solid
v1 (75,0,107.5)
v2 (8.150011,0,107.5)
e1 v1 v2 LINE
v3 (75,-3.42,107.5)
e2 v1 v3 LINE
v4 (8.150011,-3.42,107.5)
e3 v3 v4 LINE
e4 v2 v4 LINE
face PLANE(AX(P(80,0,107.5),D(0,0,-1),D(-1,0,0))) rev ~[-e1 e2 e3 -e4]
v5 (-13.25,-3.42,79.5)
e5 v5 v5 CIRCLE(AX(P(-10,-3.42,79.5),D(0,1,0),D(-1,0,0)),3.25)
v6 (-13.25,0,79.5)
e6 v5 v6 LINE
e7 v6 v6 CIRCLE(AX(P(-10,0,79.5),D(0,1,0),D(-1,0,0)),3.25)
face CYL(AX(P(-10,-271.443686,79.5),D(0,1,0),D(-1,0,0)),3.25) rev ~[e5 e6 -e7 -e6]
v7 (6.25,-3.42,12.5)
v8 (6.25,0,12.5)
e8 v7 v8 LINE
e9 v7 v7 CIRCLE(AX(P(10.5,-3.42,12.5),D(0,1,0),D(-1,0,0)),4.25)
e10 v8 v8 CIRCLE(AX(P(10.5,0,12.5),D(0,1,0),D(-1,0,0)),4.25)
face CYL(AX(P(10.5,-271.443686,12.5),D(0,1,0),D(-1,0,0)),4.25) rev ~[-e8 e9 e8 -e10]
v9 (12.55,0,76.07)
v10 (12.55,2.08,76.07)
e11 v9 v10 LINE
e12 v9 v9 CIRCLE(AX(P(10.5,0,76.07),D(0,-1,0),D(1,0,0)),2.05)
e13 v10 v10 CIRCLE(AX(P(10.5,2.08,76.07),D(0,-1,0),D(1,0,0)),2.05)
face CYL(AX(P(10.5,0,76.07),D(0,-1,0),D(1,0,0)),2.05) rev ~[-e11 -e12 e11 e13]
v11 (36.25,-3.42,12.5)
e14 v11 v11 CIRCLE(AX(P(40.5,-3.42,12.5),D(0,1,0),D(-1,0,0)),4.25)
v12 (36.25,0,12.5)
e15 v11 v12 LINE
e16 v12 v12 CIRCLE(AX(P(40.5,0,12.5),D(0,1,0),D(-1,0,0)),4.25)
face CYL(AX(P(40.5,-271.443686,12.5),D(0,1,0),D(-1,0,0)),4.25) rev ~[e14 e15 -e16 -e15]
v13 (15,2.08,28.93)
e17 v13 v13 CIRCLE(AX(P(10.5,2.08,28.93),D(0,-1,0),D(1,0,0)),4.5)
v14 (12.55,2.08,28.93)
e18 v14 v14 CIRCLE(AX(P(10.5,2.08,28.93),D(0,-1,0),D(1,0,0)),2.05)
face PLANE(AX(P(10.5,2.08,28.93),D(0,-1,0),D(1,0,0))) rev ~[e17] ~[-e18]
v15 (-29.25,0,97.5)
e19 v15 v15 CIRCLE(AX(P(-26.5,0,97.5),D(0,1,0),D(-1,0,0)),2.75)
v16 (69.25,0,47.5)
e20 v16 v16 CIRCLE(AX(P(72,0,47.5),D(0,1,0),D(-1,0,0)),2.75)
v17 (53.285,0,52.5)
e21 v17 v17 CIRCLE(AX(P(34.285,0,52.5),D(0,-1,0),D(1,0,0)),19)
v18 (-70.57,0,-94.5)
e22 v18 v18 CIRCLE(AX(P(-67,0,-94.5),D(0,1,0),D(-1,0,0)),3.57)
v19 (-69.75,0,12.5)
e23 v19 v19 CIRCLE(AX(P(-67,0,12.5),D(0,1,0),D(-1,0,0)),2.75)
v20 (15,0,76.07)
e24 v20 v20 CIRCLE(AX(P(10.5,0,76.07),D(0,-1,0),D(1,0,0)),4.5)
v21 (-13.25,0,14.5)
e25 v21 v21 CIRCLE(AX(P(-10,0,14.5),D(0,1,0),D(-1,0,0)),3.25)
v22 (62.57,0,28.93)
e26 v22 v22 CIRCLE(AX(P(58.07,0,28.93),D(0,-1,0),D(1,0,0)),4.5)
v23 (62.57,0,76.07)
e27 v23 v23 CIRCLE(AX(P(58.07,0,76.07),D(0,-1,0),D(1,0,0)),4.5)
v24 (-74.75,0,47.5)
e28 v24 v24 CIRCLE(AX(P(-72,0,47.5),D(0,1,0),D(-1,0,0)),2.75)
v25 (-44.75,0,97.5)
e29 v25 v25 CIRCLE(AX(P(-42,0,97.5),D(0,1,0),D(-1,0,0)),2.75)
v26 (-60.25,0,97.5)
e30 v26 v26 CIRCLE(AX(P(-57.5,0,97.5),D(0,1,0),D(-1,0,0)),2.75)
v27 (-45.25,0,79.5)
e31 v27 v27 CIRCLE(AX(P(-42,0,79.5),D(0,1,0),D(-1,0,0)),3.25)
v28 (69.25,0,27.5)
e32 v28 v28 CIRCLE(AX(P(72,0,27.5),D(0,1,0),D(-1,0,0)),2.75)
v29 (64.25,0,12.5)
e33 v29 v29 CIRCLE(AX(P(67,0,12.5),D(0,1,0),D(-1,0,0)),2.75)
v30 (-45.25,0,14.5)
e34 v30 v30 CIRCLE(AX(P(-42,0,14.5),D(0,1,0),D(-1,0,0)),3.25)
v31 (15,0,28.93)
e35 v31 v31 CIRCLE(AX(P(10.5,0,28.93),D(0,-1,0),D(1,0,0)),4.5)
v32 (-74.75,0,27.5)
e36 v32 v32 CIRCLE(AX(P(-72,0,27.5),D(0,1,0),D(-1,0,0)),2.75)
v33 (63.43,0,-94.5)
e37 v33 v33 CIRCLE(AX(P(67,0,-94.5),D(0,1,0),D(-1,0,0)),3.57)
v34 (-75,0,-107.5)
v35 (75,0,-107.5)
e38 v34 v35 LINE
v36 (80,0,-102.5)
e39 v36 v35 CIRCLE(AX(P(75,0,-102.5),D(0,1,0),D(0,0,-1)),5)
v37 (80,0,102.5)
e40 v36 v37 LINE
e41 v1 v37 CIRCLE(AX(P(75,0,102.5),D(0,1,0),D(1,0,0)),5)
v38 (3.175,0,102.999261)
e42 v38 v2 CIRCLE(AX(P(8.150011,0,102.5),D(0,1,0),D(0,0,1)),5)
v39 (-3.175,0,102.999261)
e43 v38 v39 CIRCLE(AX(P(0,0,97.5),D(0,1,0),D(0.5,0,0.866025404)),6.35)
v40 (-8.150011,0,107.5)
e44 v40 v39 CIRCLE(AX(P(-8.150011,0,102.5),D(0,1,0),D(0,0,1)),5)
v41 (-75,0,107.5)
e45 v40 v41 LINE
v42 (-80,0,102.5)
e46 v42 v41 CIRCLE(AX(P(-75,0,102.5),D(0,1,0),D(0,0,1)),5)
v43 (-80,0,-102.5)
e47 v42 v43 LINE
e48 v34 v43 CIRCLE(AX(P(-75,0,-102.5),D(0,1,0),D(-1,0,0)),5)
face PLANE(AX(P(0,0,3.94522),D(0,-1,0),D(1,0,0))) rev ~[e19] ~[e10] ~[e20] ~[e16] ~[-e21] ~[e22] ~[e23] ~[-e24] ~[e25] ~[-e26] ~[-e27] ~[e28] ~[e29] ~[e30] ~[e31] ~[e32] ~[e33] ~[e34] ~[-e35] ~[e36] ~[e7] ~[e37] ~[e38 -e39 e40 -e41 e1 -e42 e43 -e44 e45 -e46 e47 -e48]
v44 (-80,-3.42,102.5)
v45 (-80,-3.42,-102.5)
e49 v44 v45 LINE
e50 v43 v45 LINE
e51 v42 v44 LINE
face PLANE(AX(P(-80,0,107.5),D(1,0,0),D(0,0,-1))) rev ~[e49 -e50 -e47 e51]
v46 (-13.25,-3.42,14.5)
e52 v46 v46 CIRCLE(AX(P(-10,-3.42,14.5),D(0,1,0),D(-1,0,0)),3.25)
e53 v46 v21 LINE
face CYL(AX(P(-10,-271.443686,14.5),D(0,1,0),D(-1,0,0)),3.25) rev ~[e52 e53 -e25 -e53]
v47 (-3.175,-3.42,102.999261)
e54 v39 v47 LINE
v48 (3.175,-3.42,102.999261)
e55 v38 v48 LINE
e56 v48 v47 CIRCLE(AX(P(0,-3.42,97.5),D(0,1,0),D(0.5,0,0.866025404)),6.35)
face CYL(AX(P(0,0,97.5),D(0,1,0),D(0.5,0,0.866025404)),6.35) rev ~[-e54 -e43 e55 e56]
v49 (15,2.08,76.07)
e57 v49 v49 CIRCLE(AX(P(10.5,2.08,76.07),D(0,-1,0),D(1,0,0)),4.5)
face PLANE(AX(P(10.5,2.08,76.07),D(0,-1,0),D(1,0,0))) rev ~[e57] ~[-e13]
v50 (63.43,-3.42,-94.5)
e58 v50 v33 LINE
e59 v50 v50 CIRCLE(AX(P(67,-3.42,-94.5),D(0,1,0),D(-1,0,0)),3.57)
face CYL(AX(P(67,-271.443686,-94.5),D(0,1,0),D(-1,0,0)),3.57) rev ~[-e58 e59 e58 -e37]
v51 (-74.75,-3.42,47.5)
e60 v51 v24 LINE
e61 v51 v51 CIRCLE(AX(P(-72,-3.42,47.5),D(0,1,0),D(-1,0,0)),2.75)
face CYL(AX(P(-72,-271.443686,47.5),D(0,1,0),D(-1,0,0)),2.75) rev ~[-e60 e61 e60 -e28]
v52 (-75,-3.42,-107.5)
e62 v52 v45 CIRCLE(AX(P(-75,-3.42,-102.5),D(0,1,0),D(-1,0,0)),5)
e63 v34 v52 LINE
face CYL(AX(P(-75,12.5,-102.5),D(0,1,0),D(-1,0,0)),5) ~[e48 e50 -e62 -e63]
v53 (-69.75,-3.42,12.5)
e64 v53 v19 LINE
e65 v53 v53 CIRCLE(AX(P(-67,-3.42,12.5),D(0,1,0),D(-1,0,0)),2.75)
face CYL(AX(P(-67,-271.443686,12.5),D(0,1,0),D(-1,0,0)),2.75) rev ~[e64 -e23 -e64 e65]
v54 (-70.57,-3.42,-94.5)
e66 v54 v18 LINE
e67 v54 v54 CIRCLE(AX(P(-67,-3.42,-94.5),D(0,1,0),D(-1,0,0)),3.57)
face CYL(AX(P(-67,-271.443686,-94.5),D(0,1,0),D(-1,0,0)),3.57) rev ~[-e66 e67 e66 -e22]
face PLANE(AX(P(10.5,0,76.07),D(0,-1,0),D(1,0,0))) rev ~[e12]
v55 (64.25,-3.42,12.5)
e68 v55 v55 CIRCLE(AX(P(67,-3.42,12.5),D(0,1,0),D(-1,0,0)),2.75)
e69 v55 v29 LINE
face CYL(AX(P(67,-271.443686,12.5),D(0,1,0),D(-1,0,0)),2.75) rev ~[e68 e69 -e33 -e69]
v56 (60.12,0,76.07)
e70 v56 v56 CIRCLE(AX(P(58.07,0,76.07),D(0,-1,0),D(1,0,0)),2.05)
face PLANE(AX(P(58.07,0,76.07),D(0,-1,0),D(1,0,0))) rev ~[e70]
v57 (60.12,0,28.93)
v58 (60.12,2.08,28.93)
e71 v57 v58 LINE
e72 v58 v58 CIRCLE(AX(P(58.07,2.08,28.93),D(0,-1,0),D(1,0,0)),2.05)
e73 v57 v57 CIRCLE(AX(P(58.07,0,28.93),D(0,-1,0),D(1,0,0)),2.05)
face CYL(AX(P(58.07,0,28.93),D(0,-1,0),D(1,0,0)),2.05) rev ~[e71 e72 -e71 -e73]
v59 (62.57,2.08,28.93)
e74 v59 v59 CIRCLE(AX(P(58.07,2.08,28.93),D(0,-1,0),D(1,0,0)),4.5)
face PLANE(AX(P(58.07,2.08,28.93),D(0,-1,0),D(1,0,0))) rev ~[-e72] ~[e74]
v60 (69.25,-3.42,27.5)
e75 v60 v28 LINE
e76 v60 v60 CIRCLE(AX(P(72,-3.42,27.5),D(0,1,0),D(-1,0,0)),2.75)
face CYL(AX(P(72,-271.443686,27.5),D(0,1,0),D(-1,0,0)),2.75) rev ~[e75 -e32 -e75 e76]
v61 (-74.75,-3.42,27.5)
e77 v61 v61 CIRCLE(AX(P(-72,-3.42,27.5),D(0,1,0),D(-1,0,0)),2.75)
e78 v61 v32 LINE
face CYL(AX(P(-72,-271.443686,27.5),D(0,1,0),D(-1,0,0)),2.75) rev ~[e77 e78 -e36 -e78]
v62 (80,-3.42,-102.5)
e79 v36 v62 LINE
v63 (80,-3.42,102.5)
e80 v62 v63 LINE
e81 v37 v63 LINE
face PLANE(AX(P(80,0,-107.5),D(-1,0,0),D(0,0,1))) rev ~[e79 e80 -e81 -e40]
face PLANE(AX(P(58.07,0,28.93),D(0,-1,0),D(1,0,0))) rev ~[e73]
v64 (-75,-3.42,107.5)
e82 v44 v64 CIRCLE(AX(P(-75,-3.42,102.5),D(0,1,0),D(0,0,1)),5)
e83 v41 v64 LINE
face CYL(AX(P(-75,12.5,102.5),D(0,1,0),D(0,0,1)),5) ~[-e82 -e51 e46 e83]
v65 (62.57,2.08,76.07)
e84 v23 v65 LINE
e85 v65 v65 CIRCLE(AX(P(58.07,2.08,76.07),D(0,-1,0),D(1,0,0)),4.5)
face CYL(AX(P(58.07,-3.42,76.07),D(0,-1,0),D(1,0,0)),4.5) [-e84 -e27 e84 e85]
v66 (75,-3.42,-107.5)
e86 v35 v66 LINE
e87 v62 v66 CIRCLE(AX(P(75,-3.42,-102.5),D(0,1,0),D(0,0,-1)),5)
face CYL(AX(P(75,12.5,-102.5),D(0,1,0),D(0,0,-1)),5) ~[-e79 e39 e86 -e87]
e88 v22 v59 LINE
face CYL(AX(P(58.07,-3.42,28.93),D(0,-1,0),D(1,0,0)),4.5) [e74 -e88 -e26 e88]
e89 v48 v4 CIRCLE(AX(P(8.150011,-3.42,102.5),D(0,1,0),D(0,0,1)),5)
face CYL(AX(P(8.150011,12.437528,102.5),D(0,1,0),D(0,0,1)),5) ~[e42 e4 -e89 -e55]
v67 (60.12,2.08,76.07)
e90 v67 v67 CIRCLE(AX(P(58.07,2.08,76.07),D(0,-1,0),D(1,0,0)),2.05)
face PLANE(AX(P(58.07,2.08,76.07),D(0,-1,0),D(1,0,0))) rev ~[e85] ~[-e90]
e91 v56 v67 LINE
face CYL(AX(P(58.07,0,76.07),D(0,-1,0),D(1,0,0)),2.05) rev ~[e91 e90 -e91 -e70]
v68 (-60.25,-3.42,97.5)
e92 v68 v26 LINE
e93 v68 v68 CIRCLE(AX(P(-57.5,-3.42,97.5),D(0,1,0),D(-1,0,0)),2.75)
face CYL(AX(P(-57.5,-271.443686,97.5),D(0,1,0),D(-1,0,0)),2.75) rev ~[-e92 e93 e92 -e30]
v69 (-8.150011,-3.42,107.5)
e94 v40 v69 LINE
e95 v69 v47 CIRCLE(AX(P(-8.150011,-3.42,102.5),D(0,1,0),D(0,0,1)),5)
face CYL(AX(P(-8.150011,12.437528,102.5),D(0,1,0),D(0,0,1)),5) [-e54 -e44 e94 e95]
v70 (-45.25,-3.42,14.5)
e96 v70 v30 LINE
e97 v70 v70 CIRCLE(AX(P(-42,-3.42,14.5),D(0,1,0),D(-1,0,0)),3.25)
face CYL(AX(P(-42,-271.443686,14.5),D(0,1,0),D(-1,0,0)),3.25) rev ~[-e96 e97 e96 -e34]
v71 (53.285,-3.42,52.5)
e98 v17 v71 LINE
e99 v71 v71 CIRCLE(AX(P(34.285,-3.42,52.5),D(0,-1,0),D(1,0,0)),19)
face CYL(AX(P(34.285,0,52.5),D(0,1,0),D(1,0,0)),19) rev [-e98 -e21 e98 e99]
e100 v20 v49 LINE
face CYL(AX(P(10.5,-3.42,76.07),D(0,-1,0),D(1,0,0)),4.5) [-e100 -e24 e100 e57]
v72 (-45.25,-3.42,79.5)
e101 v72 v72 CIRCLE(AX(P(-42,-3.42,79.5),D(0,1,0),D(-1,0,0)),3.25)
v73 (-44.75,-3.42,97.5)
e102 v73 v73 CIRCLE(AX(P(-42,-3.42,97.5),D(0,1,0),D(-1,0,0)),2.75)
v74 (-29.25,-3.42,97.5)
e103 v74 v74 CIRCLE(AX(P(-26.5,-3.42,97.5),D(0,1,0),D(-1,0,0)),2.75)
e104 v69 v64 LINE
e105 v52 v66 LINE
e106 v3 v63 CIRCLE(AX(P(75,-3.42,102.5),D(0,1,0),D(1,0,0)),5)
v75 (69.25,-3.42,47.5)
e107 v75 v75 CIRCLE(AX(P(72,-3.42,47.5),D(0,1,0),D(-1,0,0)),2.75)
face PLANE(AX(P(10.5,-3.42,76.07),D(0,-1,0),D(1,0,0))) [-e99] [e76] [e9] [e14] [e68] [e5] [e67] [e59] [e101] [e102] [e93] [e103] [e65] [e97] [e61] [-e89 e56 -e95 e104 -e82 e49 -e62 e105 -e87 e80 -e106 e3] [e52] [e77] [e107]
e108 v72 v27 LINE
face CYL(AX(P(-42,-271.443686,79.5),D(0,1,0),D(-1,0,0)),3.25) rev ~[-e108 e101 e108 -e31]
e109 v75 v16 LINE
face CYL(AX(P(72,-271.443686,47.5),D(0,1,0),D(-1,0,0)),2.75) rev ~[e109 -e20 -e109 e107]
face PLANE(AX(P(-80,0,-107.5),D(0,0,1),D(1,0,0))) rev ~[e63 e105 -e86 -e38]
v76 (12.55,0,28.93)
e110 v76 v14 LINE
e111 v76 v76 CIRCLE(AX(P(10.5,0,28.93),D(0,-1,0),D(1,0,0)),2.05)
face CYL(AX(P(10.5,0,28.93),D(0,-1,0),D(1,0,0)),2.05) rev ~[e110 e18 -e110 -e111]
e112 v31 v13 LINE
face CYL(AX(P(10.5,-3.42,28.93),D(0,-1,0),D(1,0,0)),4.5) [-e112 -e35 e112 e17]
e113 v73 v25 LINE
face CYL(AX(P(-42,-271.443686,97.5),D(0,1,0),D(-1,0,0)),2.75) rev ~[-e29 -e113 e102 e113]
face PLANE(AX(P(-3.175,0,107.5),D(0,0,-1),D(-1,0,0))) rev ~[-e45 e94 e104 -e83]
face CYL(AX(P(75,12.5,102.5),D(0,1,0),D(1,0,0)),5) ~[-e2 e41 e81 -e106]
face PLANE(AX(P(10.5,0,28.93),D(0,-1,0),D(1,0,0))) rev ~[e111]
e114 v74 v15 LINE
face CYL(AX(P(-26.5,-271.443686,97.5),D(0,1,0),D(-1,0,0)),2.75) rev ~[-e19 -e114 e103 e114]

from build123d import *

# Parameters (mm, degrees)
F0_R        = 19
F1_DEPTH    = 3.42
F2_T1_DEPTH = 28.42
F2_T3_DEPTH = 28.2950568544
F4_D        = 6.5
F5_D        = 5.5
F6_D        = 8.5
F7_D        = 7.14
F8_R        = 4.5
F9_DEPTH    = 5.5
F10_D       = 4.1
F10_DEPTH   = 2.081


# Not quite as in the source:
# - a fillet or chamfer that OpenCascade refuses, or shapes differently, is made with other operations: its cross-section is extruded or revolved along the edge and cut away or added
# - a feature names something its author has since deleted; it is built from what else it names


with BuildPart() as f1:
    # F0 (on Front) → F1 (new body)
    with BuildSketch(Plane.XZ):
        with BuildLine():
            Line((-80, -107.5), (80, -107.5))
            Line((80, -107.5), (80, 107.5))
            Line((80, 107.5), (3.175, 107.5))
            Line((3.175, 107.5), (3.175, 102.999261314))
            ThreePointArc((3.175, 102.999261314), (0, 91.15), (-3.175, 102.999261314))
            Line((-3.175, 102.999261314), (-3.175, 107.5))
            Line((-3.175, 107.5), (-80, 107.5))
            Line((-80, 107.5), (-80, -107.5))
        make_face()
        with Locations((34.285, 52.5)):
            Circle(F0_R, mode=Mode.SUBTRACT)
    extrude(amount=F1_DEPTH)

    # F2: fillet of radius 5 on 6 edges, made by hand

    # F2_s2 → F2_t1 (cut)
    with BuildSketch(Plane.XZ.offset(-12.5)):
        with BuildLine():
            ThreePointArc((-75, 107.5), (-78.5355339059, 106.0355339059), (-80, 102.5))
            Line((-80, 102.5), (-80, 107.5))
            Line((-80, 107.5), (-75, 107.5))
        make_face()
        with BuildLine():
            ThreePointArc((75, -107.5), (78.5355339059, -106.0355339059), (80, -102.5))
            Line((80, -102.5), (80, -107.5))
            Line((80, -107.5), (75, -107.5))
        make_face()
        with BuildLine():
            ThreePointArc((-80, -102.5), (-78.5355339059, -106.0355339059), (-75, -107.5))
            Line((-75, -107.5), (-80, -107.5))
            Line((-80, -107.5), (-80, -102.5))
        make_face()
        with BuildLine():
            ThreePointArc((80, 102.5), (78.5355339059, 106.0355339059), (75, 107.5))
            Line((75, 107.5), (80, 107.5))
            Line((80, 107.5), (80, 102.5))
        make_face()
    extrude(amount=F2_T1_DEPTH, mode=Mode.SUBTRACT)

    # F2_s4 → F2_t3 (cut)
    with BuildSketch(Plane.XZ.offset(-12.4375284272)):
        with BuildLine():
            ThreePointArc((-8.1500113709, 107.5), (-4.7956341239, 106.2078502242), (-3.175, 102.999261314))
            Line((-3.175, 102.999261314), (-3.175, 107.5))
            Line((-3.175, 107.5), (-8.1500113709, 107.5))
        make_face()
        with BuildLine():
            ThreePointArc((8.1500113709, 107.5), (4.7956341239, 106.2078502242), (3.175, 102.999261314))
            Line((3.175, 102.999261314), (3.175, 107.5))
            Line((3.175, 107.5), (8.1500113709, 107.5))
        make_face()
    extrude(amount=F2_T3_DEPTH, mode=Mode.SUBTRACT)

    # F4 (through all)
    with Locations(Plane.XZ.offset(3.42)):
        with Locations((-42, 79.5), (-10, 79.5), (-42, 14.5), (-10, 14.5)):
            Hole(F4_D / 2)

    # F5 (through all)
    with Locations(Plane.XZ.offset(3.42)):
        with Locations((-72, 47.5), (-72, 27.5), (72, 47.5), (72, 27.5), (-57.5, 97.5), (-26.5, 97.5), (-67, 12.5), (67, 12.5), (-42, 97.5)):
            Hole(F5_D / 2)

    # F6 (through all)
    with Locations(Plane.XZ.offset(3.42)):
        with Locations((10.5, 12.5), (40.5, 12.5)):
            Hole(F6_D / 2)

    # F7 (through all)
    with Locations(Plane.XZ.offset(3.42)):
        with Locations((-67, -94.5), (67, -94.5)):
            Hole(F7_D / 2)

    # F8 (on face) → F9 (join)
    with BuildSketch(Plane.XZ.offset(3.42)):
        with Locations((10.5, 76.07)):
            Circle(F8_R)
        with Locations((58.07, 76.07)):
            Circle(F8_R)
        with Locations((58.07, 28.93)):
            Circle(F8_R)
        with Locations((10.5, 28.93)):
            Circle(F8_R)
    extrude(amount=-F9_DEPTH)

    # F10 (through all, one way)
    with BuildSketch(Plane.XZ):
        with Locations((10.5, 76.07), (58.07, 76.07), (10.5, 28.93), (58.07, 28.93)):
            Circle(F10_D / 2)
    extrude(amount=-F10_DEPTH, mode=Mode.SUBTRACT)


solid = f1.part
